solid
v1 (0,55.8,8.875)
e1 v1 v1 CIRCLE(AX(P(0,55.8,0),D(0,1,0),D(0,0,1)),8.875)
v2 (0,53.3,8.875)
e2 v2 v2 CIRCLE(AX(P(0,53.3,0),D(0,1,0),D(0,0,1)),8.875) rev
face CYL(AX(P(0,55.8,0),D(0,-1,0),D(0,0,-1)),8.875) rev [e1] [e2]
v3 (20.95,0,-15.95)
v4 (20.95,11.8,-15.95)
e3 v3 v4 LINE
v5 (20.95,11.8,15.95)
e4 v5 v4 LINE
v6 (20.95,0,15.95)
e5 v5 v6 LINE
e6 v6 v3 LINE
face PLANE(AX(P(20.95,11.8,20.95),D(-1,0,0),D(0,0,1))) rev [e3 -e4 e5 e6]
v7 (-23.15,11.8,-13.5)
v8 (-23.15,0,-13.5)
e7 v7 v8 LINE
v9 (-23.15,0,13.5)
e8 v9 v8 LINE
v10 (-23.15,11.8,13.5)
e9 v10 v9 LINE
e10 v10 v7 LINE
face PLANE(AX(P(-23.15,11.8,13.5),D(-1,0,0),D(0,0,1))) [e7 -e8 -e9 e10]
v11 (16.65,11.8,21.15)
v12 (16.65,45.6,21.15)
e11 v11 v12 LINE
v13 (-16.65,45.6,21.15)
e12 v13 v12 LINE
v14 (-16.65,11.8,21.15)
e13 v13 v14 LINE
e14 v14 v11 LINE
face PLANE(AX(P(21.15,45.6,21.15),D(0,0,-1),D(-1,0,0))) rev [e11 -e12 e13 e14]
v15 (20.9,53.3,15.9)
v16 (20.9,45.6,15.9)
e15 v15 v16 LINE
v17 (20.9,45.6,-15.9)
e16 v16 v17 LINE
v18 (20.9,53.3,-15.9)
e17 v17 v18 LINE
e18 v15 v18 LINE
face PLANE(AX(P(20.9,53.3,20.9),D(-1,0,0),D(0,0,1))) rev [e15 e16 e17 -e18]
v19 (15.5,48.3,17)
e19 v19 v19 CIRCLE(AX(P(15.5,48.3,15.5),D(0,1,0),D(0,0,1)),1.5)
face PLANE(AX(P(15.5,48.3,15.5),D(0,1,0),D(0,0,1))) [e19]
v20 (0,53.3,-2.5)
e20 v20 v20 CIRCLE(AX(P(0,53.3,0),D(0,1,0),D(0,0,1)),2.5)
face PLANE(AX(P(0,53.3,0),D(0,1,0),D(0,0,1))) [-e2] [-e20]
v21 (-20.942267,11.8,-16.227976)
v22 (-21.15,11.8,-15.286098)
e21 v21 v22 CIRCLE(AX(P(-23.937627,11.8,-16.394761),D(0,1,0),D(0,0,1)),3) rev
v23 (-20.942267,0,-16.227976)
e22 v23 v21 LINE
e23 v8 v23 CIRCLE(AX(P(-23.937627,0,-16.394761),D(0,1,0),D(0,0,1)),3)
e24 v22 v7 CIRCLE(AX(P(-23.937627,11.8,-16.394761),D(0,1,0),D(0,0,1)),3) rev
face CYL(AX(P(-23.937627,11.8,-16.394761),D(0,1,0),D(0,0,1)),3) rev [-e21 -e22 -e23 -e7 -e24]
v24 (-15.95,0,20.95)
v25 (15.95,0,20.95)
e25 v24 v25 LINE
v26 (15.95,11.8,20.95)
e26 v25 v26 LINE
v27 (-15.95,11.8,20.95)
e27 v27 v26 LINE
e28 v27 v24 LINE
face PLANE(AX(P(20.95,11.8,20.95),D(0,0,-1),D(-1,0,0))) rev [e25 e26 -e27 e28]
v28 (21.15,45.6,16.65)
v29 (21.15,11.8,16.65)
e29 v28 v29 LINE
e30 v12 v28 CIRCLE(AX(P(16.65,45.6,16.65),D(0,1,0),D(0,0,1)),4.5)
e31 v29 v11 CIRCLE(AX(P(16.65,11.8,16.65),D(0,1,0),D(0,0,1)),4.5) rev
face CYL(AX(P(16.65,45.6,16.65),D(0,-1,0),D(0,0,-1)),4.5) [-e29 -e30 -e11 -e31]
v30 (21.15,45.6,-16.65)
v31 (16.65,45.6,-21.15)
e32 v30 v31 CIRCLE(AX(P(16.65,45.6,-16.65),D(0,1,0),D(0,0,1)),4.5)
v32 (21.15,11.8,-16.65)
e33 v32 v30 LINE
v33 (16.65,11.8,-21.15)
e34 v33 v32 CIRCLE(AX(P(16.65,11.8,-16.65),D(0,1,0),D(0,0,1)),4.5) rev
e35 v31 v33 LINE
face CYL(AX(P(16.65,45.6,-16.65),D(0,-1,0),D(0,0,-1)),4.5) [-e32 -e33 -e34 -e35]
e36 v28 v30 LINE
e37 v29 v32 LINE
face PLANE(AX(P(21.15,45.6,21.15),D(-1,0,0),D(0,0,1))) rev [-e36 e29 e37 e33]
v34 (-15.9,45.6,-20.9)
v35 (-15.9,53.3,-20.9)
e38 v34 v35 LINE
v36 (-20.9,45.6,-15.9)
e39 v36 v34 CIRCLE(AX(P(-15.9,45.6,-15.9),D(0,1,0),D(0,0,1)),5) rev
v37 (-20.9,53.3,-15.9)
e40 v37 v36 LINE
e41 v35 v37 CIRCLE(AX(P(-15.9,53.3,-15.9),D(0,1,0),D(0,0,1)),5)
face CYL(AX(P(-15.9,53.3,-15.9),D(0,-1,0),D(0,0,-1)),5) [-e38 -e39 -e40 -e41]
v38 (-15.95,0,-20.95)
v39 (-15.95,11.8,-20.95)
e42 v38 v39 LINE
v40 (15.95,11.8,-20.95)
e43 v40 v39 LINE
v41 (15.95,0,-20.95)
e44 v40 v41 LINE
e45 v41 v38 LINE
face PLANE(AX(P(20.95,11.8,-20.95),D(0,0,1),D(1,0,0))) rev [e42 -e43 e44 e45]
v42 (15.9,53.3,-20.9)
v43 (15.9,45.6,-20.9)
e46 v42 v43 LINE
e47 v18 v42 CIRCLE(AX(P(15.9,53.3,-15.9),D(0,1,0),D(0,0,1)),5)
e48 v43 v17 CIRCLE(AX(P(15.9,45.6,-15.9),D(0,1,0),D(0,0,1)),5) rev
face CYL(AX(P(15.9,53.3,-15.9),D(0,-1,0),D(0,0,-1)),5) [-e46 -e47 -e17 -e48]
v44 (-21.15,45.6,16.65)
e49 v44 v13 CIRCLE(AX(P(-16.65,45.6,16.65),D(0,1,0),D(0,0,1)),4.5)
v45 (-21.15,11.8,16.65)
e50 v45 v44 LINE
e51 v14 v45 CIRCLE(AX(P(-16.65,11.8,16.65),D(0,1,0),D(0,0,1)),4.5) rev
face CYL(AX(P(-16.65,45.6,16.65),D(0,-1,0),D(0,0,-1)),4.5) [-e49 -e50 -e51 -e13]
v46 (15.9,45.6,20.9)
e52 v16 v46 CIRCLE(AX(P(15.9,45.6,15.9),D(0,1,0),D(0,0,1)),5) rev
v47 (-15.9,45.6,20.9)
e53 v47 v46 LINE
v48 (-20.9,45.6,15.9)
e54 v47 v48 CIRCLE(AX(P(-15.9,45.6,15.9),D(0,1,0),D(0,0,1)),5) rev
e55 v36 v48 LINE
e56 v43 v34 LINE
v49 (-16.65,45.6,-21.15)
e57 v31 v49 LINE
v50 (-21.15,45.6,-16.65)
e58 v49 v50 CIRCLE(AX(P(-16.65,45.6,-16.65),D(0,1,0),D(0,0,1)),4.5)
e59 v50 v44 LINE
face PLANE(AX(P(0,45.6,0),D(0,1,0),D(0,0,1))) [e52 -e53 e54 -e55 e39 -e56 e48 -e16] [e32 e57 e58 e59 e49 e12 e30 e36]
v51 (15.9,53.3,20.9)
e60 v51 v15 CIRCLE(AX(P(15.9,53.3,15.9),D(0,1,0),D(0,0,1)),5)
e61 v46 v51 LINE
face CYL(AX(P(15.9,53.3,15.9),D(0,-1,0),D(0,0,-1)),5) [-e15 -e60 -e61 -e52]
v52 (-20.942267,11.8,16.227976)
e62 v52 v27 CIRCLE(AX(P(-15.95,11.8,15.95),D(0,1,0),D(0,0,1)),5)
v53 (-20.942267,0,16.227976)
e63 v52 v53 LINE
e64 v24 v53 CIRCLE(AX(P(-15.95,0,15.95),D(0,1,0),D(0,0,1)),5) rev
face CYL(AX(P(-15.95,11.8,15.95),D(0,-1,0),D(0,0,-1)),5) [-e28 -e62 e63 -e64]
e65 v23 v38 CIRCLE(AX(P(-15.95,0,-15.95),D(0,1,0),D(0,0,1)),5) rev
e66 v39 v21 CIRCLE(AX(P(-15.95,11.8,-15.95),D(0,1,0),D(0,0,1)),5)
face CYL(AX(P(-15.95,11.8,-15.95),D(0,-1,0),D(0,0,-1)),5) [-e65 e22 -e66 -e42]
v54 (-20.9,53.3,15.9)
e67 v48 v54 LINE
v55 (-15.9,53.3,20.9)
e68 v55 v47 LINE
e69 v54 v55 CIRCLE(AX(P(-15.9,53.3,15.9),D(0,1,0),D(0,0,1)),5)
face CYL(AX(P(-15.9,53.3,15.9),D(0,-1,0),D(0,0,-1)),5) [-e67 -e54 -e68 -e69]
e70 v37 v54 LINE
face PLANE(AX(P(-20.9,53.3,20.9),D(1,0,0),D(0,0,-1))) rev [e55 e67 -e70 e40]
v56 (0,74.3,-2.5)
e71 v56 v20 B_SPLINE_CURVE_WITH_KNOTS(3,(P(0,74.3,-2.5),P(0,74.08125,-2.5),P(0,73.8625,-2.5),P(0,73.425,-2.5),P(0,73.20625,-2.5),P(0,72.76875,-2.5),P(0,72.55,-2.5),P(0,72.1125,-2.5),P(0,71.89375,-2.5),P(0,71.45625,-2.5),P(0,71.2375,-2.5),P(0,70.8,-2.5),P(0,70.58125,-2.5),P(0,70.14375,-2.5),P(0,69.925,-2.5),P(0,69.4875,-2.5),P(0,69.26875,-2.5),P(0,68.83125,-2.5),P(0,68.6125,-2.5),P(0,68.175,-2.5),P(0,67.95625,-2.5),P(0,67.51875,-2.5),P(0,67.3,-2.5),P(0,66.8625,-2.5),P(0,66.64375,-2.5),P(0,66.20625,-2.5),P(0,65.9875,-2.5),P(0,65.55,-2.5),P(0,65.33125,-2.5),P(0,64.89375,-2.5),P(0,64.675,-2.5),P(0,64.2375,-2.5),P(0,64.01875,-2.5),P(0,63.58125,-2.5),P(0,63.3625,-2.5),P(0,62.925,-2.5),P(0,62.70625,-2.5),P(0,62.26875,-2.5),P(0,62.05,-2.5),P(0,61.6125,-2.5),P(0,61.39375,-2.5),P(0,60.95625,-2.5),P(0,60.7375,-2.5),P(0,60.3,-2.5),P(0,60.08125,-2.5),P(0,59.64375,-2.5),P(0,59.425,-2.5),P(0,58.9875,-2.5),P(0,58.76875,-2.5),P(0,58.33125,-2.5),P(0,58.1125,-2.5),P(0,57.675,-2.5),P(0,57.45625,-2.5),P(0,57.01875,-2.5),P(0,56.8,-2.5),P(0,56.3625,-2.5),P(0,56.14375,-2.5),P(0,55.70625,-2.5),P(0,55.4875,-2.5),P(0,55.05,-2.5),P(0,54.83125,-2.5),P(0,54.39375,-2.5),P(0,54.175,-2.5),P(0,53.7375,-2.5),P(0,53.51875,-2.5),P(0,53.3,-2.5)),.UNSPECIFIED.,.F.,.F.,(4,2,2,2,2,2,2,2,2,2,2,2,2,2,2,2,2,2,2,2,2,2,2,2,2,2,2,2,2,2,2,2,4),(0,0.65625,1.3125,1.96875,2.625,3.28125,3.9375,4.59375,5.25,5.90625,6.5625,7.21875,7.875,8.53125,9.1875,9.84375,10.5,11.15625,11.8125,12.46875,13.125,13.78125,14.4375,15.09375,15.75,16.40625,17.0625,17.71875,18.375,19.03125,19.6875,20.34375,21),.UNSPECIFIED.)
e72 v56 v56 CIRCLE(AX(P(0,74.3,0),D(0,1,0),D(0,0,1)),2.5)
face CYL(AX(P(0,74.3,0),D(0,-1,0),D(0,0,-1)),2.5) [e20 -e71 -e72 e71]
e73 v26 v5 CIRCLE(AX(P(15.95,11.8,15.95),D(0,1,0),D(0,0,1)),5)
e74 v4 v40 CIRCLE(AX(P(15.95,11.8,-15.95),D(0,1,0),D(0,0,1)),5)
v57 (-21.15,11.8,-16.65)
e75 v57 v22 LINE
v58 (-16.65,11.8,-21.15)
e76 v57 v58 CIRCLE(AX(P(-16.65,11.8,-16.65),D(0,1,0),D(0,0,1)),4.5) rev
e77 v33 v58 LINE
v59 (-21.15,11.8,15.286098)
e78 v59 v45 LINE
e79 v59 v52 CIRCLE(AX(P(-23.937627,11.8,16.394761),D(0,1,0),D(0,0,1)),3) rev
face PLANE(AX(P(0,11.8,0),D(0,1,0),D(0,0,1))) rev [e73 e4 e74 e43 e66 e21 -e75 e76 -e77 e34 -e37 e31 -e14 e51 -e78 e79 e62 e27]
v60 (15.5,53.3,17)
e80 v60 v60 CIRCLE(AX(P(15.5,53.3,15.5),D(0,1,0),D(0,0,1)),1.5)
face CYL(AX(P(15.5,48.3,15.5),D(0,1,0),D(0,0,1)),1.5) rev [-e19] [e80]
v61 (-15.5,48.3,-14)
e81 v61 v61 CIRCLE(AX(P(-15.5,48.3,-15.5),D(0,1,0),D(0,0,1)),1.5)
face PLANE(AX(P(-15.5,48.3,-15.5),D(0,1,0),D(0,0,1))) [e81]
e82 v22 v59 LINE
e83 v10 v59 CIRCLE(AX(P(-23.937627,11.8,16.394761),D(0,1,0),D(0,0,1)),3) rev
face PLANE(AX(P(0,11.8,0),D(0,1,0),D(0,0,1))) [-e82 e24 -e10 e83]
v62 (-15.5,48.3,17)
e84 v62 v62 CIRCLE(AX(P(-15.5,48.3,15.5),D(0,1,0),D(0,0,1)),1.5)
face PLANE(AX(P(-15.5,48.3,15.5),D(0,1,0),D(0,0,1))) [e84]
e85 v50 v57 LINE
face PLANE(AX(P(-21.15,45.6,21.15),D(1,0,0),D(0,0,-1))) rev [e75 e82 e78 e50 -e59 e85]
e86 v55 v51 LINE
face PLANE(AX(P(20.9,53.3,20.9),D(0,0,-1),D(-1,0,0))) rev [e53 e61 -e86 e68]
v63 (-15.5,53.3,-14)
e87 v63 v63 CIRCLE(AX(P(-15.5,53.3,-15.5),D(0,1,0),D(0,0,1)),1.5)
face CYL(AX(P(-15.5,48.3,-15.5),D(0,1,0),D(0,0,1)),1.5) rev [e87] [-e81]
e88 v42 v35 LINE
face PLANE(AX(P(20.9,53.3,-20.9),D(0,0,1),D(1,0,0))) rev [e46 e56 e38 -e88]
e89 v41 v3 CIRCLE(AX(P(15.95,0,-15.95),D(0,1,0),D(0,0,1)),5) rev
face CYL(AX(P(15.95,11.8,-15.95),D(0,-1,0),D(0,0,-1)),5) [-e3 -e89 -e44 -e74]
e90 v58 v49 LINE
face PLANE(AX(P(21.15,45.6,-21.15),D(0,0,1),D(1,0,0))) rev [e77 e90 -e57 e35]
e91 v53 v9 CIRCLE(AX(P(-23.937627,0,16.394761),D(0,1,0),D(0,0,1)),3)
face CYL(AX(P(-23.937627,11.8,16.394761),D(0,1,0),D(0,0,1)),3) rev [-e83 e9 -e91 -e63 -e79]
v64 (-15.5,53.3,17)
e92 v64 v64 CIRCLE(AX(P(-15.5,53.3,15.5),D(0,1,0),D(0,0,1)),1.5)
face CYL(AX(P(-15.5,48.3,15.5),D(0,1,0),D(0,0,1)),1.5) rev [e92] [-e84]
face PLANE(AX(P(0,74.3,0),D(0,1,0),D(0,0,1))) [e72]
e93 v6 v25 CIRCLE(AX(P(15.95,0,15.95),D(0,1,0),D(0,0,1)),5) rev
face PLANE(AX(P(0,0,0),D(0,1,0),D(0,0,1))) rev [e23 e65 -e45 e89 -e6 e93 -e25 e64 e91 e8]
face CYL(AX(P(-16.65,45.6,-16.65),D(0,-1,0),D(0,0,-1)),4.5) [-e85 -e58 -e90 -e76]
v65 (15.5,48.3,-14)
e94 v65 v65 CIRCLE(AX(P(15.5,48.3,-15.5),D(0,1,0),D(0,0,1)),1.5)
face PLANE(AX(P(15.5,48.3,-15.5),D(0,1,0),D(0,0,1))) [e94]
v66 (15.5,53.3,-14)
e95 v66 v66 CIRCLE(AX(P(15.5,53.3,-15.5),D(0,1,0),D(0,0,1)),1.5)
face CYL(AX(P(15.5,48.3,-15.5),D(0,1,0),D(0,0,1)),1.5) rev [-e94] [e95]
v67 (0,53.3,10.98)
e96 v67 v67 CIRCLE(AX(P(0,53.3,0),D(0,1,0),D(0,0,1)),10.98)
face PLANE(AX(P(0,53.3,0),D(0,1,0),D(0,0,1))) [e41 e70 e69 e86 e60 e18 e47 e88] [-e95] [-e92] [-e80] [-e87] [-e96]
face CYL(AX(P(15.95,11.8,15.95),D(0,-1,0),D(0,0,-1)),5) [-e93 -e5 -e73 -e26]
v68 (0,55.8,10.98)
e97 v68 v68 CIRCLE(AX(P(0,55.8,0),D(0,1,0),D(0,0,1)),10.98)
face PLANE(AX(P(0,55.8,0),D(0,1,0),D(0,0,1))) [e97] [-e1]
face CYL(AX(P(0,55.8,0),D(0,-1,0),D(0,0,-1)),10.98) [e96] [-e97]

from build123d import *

# Parameters (mm, degrees)
SKETCH1_W           = 41.9
SKETCH1_H           = 41.9
BOSS_EXTRUDE1_DEPTH = 11.8
SKETCH2_W           = 42.3
SKETCH2_H           = 42.3
BOSS_EXTRUDE2_DEPTH = 33.8
SKETCH3_W           = 41.8
SKETCH3_H           = 41.8
BOSS_EXTRUDE3_DEPTH = 7.7
SKETCH4_R           = 10.98
SKETCH4_R_2         = 8.875
BOSS_EXTRUDE4_DEPTH = 2.5
FILLET1_R           = 5
FILLET3_R           = 4.5
SKETCH5_R           = 2.5
BOSS_EXTRUDE5_DEPTH = 21
SKETCH6_R           = 1.5
CUT_EXTRUDE1_DEPTH  = 5
SKETCH7_W           = 2.2
SKETCH7_H           = 27
BOSS_EXTRUDE6_DEPTH = 11.8
FILLET5_R           = 3


with BuildPart() as part:
    # Sketch1 → Boss-Extrude1 (new body)
    with BuildSketch(Plane(origin=(0, 0, 0), x_dir=(1, 0, 0), z_dir=(0, 1, 0))):
        Rectangle(SKETCH1_W, SKETCH1_H)
    extrude(amount=BOSS_EXTRUDE1_DEPTH)

    # Sketch2 → Boss-Extrude2 (add)
    with BuildSketch(Plane(origin=(0, 11.8, 0), x_dir=(1, 0, 0), z_dir=(0, 1, 0))):
        Rectangle(SKETCH2_W, SKETCH2_H)
    extrude(amount=BOSS_EXTRUDE2_DEPTH)

    # Sketch3 → Boss-Extrude3 (add)
    with BuildSketch(Plane(origin=(0, 45.6, 0), x_dir=(1, 0, 0), z_dir=(0, 1, 0))):
        Rectangle(SKETCH3_W, SKETCH3_H)
    extrude(amount=BOSS_EXTRUDE3_DEPTH)

    # Sketch4 → Boss-Extrude4 (add)
    with BuildSketch(Plane(origin=(0, 53.3, 0), x_dir=(1, 0, 0), z_dir=(0, 1, 0))):
        with Locations(Location((0, 0, 0), (0, 0, 270))):
            Circle(SKETCH4_R)
        with Locations(Location((0, 0, 0), (0, 0, 270))):
            Circle(SKETCH4_R_2, mode=Mode.SUBTRACT)
    extrude(amount=BOSS_EXTRUDE4_DEPTH)

    # Fillet1
    fillet1_edges = [part.edges().sort_by_distance(p)[0] for p in [
        (-20.9, 49.45, -20.9),
        (-20.9, 49.45, 20.9),
        (20.9, 49.45, 20.9),
        (20.9, 49.45, -20.9),
        (-20.95, 5.9, -20.95),
        (20.95, 5.9, -20.95),
        (20.95, 5.9, 20.95),
        (-20.95, 5.9, 20.95),
    ]]
    fillet(fillet1_edges, radius=FILLET1_R)

    # Fillet3
    fillet3_edges = [part.edges().sort_by_distance(p)[0] for p in [
        (-21.15, 28.7, -21.15),
        (-21.15, 28.7, 21.15),
        (21.15, 28.7, 21.15),
        (21.15, 28.7, -21.15),
    ]]
    fillet(fillet3_edges, radius=FILLET3_R)

    # Sketch5 → Boss-Extrude5 (add)
    with BuildSketch(Plane(origin=(0, 53.3, 0), x_dir=(1, 0, 0), z_dir=(0, 1, 0))):
        with Locations(Location((0, 0, 0), (0, 0, 90))):
            Circle(SKETCH5_R)
    extrude(amount=BOSS_EXTRUDE5_DEPTH)

    # Sketch6 → Cut-Extrude1 (cut)
    with BuildSketch(Plane(origin=(0, 53.3, 0), x_dir=(1, 0, 0), z_dir=(0, 1, 0))):
        with Locations(Location((-15.5, -15.5, 0), (0, 0, 270))):
            Circle(SKETCH6_R)
        with Locations(Location((-15.5, 15.5, 0), (0, 0, 270))):
            Circle(SKETCH6_R)
        with Locations(Location((15.5, 15.5, 0), (0, 0, 270))):
            Circle(SKETCH6_R)
        with Locations(Location((15.5, -15.5, 0), (0, 0, 270))):
            Circle(SKETCH6_R)
    extrude(amount=-CUT_EXTRUDE1_DEPTH, mode=Mode.SUBTRACT)

    # Sketch7 → Boss-Extrude6 (add)
    with BuildSketch(Plane.XZ):
        with Locations((-22.05, 0)):
            Rectangle(SKETCH7_W, SKETCH7_H)
    extrude(amount=-BOSS_EXTRUDE6_DEPTH)

    # Fillet5
    # the kernel refuses this fillet: 3 mm, written as the material it adds along each edge
    with BuildSketch(Plane(origin=(-20.95, 0, 13.5), x_dir=(0.0028347051318629093, 0, 0.9999959822153364), z_dir=(0, 1, 0))) as fillet5_piece_1:
        with BuildLine():
            CenterArc((2.886280715, -2.99582093), FILLET5_R, 93.02459513, 71.592016422)
            Line((-0.006236351, -2.199991161), (-0.295488058, -2.120408184))
            ThreePointArc((-0.295488058, -2.120408184), (-0.30311697, -1.099145169), (-0.299998795, 0.000850412))
            Line((-0.299998795, 0.000850412), (0.000850412, 0.299998795))
            ThreePointArc((0.000850412, 0.299998795), (2.450840568, 0.293053767), (2.712157439, 0.299582093))
            Line((2.712157439, 0.299582093), (2.727986828, 0))
        make_face()
    extrude(amount=11.8)
    with BuildSketch(Plane(origin=(-20.95, 0, -13.5), x_dir=(-1.0, 0, 2.215601439689644e-12), z_dir=(0, 1, 0))) as fillet5_piece_2:
        with BuildLine():
            CenterArc((2.987627139, -2.894761387), FILLET5_R, 105.22097159, 71.592016422)
            Line((-0.007733038, -2.727975867), (-0.307269056, -2.711297315))
            ThreePointArc((-0.307269056, -2.711297315), (-0.3, -2.45), (-0.3, 0))
            Line((-0.3, 0), (0, 0.3))
            ThreePointArc((0, 0.3), (1.1, 0.3), (2.121237286, 0.289476139))
            Line((2.121237286, 0.289476139), (2.2, 0))
        make_face()
    extrude(amount=11.8)


solid = part.part
